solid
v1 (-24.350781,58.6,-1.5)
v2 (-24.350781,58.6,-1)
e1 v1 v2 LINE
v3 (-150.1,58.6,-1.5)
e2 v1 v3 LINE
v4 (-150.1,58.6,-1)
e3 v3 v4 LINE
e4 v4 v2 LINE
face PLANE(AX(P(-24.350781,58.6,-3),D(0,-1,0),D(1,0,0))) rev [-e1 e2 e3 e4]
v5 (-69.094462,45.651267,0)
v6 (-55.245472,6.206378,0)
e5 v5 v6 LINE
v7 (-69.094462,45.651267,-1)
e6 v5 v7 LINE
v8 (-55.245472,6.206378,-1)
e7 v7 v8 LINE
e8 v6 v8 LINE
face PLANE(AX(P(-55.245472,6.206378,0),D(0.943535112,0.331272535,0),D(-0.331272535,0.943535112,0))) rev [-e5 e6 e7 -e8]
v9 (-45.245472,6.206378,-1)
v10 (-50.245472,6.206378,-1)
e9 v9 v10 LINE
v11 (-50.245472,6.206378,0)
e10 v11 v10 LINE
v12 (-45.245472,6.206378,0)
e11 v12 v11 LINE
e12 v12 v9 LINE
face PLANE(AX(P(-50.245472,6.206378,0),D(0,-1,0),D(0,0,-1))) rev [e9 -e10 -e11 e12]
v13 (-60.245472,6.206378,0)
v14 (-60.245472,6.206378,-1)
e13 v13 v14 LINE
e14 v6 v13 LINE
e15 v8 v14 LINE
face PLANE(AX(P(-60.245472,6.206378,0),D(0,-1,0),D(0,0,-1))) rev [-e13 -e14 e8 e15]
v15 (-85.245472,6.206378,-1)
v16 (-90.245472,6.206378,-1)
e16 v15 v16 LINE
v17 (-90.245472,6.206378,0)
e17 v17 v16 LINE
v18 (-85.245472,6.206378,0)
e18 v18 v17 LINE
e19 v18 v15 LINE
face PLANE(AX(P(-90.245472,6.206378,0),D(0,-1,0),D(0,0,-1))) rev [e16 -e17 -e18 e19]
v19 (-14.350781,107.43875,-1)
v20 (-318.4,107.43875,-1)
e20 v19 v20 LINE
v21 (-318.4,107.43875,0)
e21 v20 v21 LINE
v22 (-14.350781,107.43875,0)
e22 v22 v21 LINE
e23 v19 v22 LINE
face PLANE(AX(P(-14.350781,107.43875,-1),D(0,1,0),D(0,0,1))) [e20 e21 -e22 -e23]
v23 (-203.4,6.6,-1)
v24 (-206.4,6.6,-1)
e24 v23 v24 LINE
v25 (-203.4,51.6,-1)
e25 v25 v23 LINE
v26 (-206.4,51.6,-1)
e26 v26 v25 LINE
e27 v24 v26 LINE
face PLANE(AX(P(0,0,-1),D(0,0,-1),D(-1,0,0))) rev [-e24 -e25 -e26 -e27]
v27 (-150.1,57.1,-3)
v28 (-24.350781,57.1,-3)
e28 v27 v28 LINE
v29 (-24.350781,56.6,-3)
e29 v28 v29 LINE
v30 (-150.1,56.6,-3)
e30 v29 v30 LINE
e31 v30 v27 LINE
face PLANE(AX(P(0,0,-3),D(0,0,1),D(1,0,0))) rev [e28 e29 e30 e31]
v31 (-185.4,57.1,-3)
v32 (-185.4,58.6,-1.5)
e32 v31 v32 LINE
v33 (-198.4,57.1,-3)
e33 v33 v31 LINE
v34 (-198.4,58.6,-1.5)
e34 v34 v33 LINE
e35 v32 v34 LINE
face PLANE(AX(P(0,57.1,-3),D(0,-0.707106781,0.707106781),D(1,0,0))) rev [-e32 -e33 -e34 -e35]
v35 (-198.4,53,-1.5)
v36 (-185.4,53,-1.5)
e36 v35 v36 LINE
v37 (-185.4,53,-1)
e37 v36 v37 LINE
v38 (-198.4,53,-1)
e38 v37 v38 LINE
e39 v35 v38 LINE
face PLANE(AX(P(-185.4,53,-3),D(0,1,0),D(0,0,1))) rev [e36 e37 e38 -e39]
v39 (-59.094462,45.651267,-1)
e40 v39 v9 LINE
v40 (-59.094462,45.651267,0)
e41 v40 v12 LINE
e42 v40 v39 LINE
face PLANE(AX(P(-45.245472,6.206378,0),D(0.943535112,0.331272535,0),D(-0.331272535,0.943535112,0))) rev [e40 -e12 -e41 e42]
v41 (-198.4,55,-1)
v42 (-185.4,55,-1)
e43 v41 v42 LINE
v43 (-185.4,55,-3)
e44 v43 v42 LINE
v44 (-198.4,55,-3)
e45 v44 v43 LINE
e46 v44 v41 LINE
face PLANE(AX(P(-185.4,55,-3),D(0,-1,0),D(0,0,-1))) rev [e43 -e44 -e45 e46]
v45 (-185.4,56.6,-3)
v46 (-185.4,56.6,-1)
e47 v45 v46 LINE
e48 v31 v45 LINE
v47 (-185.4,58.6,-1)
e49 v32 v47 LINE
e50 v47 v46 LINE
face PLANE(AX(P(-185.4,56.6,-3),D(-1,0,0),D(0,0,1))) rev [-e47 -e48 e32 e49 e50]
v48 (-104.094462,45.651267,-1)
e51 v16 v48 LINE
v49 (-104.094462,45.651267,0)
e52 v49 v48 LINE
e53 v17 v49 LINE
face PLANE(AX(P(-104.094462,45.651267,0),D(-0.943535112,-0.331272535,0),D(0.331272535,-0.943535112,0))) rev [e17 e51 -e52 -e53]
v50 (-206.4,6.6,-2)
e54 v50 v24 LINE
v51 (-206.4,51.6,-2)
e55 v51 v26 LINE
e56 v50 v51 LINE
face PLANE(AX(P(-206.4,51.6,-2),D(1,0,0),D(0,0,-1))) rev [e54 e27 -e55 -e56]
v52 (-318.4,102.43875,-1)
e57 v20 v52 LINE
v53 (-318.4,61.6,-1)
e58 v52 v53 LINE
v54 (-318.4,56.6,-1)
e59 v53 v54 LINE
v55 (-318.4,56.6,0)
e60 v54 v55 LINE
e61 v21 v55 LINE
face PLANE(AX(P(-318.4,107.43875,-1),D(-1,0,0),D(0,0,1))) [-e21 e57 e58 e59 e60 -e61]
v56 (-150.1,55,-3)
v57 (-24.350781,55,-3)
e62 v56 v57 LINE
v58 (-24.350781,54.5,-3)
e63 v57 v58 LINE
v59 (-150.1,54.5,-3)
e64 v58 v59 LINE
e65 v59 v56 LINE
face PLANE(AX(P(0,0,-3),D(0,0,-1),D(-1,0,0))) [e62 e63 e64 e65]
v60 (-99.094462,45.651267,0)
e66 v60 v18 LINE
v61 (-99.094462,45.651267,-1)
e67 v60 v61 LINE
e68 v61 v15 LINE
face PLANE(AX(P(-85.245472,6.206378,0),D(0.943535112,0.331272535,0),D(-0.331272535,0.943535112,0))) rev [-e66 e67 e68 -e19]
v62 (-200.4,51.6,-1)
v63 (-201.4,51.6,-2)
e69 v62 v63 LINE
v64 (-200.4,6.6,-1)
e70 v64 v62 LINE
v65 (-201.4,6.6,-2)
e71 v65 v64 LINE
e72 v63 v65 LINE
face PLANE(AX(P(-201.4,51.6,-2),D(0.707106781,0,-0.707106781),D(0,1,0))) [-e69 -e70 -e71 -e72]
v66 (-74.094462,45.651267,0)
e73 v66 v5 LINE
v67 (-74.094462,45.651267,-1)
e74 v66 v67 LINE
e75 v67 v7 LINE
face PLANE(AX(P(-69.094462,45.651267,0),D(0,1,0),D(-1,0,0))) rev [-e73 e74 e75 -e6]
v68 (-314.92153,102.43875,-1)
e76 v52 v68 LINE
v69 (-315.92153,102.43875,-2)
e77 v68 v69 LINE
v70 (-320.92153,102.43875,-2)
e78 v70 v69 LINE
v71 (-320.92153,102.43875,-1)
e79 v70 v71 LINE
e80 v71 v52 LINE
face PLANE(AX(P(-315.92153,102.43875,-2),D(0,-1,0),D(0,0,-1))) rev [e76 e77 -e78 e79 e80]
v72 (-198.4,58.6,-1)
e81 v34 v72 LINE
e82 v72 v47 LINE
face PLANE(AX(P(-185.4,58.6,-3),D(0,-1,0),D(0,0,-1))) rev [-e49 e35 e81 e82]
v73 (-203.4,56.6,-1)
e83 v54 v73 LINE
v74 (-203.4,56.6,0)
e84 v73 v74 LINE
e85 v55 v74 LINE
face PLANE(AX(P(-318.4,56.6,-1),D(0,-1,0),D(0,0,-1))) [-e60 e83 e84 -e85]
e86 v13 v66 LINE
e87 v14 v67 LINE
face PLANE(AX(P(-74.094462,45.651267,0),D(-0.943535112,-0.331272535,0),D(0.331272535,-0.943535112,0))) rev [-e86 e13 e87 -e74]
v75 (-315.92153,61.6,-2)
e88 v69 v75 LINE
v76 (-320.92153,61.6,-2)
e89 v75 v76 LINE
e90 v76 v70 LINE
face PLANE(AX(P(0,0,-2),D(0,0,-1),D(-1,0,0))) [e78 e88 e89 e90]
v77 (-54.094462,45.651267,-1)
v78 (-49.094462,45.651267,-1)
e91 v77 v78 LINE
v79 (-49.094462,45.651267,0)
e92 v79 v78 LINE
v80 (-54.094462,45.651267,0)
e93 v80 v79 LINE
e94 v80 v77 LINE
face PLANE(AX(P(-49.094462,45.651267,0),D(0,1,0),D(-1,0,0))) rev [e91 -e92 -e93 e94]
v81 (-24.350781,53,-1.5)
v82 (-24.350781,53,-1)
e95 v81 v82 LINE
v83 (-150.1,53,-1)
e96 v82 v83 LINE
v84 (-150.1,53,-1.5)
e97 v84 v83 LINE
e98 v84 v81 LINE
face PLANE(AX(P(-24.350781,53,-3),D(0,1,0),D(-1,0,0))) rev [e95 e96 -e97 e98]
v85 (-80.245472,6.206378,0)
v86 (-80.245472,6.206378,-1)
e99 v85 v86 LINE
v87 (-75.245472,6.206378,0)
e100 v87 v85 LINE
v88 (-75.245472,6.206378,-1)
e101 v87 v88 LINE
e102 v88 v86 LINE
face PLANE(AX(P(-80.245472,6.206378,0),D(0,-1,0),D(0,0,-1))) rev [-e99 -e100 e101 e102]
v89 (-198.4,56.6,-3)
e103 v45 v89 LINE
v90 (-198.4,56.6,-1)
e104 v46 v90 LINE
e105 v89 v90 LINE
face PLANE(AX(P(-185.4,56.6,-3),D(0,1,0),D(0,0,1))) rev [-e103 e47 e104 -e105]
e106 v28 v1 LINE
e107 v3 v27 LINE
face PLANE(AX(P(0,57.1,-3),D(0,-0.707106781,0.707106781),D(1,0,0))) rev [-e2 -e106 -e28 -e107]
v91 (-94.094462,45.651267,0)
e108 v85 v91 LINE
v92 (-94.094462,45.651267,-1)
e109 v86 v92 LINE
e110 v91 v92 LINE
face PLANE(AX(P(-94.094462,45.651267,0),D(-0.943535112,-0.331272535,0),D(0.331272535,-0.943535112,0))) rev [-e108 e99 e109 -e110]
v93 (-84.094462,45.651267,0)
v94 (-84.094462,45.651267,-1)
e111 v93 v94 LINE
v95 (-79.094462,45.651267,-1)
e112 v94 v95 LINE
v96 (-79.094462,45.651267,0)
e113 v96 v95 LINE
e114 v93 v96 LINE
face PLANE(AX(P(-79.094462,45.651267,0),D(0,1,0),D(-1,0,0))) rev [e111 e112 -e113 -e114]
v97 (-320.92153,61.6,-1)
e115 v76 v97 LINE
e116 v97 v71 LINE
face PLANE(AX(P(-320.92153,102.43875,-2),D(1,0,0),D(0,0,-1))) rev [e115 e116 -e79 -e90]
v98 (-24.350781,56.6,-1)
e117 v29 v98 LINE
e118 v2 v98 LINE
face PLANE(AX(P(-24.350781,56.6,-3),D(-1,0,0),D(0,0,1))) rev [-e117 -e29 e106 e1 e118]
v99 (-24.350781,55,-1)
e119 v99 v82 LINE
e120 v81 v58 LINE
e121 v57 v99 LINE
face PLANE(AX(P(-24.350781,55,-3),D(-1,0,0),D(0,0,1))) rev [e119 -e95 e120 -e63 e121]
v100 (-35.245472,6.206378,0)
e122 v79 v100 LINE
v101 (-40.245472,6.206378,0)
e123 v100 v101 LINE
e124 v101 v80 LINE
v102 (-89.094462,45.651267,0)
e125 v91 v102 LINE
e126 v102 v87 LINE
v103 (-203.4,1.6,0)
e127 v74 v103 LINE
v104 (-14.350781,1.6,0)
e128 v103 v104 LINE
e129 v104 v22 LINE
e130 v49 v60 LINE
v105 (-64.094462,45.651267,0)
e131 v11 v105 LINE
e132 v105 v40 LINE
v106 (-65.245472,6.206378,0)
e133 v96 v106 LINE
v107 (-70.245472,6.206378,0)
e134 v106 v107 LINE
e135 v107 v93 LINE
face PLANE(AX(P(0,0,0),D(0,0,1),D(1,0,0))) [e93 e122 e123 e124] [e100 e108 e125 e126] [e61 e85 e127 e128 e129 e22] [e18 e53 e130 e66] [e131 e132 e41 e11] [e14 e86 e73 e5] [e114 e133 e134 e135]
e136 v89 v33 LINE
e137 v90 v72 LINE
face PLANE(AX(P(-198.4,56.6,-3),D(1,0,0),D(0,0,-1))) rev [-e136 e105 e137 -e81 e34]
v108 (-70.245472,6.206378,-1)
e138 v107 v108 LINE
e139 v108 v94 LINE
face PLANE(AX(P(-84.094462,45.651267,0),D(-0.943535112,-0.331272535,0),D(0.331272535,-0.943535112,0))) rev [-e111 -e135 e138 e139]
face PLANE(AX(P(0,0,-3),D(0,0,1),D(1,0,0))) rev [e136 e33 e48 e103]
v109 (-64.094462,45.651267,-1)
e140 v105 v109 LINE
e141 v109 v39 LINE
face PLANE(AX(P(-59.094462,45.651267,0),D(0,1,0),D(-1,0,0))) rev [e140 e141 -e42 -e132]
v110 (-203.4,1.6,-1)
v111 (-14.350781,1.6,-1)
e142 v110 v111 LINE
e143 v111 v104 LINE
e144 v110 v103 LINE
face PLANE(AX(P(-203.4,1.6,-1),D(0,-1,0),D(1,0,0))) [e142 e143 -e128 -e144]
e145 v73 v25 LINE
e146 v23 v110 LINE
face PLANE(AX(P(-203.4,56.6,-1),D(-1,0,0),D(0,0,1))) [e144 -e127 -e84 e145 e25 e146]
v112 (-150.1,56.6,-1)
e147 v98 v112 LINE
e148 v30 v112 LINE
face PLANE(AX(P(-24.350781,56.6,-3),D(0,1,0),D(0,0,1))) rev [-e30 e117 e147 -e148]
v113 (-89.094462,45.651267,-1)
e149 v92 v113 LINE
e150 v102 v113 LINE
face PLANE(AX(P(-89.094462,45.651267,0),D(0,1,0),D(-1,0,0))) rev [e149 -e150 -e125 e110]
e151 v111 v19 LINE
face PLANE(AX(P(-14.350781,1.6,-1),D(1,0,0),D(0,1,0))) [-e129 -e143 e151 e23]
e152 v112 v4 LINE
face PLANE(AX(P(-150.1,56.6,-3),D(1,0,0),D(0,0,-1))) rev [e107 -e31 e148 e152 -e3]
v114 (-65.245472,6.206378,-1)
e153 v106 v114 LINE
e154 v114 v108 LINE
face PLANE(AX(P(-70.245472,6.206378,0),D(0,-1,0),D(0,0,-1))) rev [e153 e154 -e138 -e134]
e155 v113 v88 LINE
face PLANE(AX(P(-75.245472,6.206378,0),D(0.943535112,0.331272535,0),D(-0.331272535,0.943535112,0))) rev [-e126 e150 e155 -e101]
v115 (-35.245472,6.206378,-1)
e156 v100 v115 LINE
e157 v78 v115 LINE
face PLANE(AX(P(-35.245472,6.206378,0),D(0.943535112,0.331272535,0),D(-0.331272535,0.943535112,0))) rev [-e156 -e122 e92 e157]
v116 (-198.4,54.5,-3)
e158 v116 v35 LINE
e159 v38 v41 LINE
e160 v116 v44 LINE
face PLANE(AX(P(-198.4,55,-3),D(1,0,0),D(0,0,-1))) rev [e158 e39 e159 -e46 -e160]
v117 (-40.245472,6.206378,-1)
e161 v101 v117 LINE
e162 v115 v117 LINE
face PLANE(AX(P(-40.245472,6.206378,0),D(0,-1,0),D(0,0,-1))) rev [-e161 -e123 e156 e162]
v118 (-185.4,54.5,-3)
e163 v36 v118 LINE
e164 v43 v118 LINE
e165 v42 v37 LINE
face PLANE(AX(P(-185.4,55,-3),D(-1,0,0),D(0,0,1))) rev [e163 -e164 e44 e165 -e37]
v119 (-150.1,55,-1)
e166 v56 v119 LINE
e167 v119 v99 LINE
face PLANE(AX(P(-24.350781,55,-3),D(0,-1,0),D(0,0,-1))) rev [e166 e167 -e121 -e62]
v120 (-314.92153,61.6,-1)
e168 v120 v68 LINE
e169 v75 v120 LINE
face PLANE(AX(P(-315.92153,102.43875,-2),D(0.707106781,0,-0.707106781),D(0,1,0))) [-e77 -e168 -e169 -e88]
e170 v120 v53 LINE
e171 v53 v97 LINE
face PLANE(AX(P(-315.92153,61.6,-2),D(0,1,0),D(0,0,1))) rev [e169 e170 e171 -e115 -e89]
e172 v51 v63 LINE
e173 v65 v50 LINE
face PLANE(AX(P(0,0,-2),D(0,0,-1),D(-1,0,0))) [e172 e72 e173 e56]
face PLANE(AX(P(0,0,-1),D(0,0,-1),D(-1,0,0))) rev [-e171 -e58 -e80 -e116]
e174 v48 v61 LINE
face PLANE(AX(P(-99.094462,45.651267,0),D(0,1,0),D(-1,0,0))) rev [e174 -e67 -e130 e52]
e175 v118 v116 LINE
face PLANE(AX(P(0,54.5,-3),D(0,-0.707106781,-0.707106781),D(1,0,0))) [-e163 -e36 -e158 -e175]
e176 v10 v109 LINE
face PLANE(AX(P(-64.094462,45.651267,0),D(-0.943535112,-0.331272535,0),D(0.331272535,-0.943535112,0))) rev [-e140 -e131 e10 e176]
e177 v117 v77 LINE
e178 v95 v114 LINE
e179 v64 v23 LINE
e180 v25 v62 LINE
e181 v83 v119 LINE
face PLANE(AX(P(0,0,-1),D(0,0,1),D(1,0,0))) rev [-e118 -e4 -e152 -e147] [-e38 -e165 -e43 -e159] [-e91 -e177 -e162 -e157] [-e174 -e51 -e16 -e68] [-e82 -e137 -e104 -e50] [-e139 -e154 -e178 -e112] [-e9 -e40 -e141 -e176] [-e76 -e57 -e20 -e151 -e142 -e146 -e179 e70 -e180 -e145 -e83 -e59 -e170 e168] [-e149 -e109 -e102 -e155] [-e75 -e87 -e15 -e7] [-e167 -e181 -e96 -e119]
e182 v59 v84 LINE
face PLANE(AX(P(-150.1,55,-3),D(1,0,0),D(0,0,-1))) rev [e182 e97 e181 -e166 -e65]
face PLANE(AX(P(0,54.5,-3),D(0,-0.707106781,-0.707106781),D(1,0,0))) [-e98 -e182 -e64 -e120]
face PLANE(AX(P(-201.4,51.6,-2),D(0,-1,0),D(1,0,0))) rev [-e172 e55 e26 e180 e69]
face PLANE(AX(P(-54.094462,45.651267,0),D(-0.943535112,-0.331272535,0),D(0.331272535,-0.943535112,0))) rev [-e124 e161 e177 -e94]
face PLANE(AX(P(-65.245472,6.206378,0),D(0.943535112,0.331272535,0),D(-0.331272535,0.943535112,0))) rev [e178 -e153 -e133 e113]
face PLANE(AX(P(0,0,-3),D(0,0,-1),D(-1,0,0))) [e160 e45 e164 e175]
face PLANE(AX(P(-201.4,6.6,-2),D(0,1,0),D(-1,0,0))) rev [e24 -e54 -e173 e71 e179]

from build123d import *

# Parameters (mm, degrees)
BOSS_EXTRU_1_DEPTH      = 1
ESQUISSE2_W             = 5
ESQUISSE2_H             = 40.838750305
ESQUISSE2_H_2           = 45
BOSS_EXTRU_2_DEPTH      = 1
ESQUISSE3_W             = 125.749218941
ESQUISSE3_H             = 2
ESQUISSE3_W_2           = 13
BOSS_EXTRU_3_DEPTH      = 2
CHANFREIN1_SIZE         = 1.5
CHANFREIN2_SIZE         = 1
ENL_V_MAT_EXTRU_1_DEPTH = 339.434208864


with BuildPart() as part:
    # Esquisse1 → Boss.-Extru.1 (new body)
    with BuildSketch(Plane.XY):
        Polygon((-318.4, 56.6), (-203.4, 56.6), (-203.4, 1.6), (-14.350781059, 1.6), (-14.350781059, 107.438750305), (-318.4, 107.438750305), align=None)
    extrude(amount=-BOSS_EXTRU_1_DEPTH)

    # Esquisse2 → Boss.-Extru.2 (add)
    with BuildSketch(Plane(origin=(0, 0, -1), x_dir=(-1, 0, 0), z_dir=(0, 0, -1))):
        with Locations((318.421530381, 82.019375153)):
            Rectangle(ESQUISSE2_W, ESQUISSE2_H)
        with Locations((203.9, 29.1)):
            Rectangle(ESQUISSE2_W, ESQUISSE2_H_2)
    extrude(amount=BOSS_EXTRU_2_DEPTH)

    # Esquisse3 → Boss.-Extru.3 (add)
    with BuildSketch(Plane(origin=(0, 0, -1), x_dir=(-1, 0, 0), z_dir=(0, 0, -1))):
        with Locations((87.22539053, 57.6)):
            Rectangle(ESQUISSE3_W, ESQUISSE3_H)
        with Locations((87.22539053, 54)):
            Rectangle(ESQUISSE3_W, ESQUISSE3_H)
        with Locations((191.9, 57.6)):
            Rectangle(ESQUISSE3_W_2, ESQUISSE3_H)
        with Locations((191.9, 54)):
            Rectangle(ESQUISSE3_W_2, ESQUISSE3_H)
    extrude(amount=BOSS_EXTRU_3_DEPTH)

    # Chanfrein1
    chanfrein1_edges = [part.edges().sort_by_distance(p)[0] for p in [
        (-87.22539053, 58.6, -3),
        (-87.22539053, 53, -3),
        (-191.9, 58.6, -3),
        (-191.9, 53, -3),
    ]]
    chamfer(chanfrein1_edges, length=CHANFREIN1_SIZE)

    # Chanfrein2
    chanfrein2_edges = [part.edges().sort_by_distance(p)[0] for p in [
        (-201.4, 29.1, -1),
        (-315.921530381, 82.019375153, -1),
    ]]
    chamfer(chanfrein2_edges, length=CHANFREIN2_SIZE - 0.0001)  # a hair under: the kernel refuses the full size

    # Esquisse4 → Enlèv. mat.-Extru.1 (cut, through all)
    with BuildSketch(Plane(origin=(0, 0, -1), x_dir=(-1, 0, 0), z_dir=(0, 0, -1))):
        Polygon((90.245471521, 6.206378309), (85.245471521, 6.206378309), (99.094461568, 45.651267323), (104.094461568, 45.651267323), align=None)
        Polygon((94.094461568, 45.651267323), (80.245471521, 6.206378309), (75.245471521, 6.206378309), (89.094461568, 45.651267323), align=None)
        Polygon((84.094461568, 45.651267323), (70.245471521, 6.206378309), (65.245471521, 6.206378309), (79.094461568, 45.651267323), align=None)
        Polygon((74.094461568, 45.651267323), (60.245471521, 6.206378309), (55.245471521, 6.206378309), (69.094461568, 45.651267323), align=None)
        Polygon((64.094461568, 45.651267323), (50.245471521, 6.206378309), (45.245471521, 6.206378309), (59.094461568, 45.651267323), align=None)
        Polygon((54.094461568, 45.651267323), (40.245471521, 6.206378309), (35.245471521, 6.206378309), (49.094461568, 45.651267323), align=None)
    extrude(amount=-ENL_V_MAT_EXTRU_1_DEPTH, mode=Mode.SUBTRACT)


solid = part.part
